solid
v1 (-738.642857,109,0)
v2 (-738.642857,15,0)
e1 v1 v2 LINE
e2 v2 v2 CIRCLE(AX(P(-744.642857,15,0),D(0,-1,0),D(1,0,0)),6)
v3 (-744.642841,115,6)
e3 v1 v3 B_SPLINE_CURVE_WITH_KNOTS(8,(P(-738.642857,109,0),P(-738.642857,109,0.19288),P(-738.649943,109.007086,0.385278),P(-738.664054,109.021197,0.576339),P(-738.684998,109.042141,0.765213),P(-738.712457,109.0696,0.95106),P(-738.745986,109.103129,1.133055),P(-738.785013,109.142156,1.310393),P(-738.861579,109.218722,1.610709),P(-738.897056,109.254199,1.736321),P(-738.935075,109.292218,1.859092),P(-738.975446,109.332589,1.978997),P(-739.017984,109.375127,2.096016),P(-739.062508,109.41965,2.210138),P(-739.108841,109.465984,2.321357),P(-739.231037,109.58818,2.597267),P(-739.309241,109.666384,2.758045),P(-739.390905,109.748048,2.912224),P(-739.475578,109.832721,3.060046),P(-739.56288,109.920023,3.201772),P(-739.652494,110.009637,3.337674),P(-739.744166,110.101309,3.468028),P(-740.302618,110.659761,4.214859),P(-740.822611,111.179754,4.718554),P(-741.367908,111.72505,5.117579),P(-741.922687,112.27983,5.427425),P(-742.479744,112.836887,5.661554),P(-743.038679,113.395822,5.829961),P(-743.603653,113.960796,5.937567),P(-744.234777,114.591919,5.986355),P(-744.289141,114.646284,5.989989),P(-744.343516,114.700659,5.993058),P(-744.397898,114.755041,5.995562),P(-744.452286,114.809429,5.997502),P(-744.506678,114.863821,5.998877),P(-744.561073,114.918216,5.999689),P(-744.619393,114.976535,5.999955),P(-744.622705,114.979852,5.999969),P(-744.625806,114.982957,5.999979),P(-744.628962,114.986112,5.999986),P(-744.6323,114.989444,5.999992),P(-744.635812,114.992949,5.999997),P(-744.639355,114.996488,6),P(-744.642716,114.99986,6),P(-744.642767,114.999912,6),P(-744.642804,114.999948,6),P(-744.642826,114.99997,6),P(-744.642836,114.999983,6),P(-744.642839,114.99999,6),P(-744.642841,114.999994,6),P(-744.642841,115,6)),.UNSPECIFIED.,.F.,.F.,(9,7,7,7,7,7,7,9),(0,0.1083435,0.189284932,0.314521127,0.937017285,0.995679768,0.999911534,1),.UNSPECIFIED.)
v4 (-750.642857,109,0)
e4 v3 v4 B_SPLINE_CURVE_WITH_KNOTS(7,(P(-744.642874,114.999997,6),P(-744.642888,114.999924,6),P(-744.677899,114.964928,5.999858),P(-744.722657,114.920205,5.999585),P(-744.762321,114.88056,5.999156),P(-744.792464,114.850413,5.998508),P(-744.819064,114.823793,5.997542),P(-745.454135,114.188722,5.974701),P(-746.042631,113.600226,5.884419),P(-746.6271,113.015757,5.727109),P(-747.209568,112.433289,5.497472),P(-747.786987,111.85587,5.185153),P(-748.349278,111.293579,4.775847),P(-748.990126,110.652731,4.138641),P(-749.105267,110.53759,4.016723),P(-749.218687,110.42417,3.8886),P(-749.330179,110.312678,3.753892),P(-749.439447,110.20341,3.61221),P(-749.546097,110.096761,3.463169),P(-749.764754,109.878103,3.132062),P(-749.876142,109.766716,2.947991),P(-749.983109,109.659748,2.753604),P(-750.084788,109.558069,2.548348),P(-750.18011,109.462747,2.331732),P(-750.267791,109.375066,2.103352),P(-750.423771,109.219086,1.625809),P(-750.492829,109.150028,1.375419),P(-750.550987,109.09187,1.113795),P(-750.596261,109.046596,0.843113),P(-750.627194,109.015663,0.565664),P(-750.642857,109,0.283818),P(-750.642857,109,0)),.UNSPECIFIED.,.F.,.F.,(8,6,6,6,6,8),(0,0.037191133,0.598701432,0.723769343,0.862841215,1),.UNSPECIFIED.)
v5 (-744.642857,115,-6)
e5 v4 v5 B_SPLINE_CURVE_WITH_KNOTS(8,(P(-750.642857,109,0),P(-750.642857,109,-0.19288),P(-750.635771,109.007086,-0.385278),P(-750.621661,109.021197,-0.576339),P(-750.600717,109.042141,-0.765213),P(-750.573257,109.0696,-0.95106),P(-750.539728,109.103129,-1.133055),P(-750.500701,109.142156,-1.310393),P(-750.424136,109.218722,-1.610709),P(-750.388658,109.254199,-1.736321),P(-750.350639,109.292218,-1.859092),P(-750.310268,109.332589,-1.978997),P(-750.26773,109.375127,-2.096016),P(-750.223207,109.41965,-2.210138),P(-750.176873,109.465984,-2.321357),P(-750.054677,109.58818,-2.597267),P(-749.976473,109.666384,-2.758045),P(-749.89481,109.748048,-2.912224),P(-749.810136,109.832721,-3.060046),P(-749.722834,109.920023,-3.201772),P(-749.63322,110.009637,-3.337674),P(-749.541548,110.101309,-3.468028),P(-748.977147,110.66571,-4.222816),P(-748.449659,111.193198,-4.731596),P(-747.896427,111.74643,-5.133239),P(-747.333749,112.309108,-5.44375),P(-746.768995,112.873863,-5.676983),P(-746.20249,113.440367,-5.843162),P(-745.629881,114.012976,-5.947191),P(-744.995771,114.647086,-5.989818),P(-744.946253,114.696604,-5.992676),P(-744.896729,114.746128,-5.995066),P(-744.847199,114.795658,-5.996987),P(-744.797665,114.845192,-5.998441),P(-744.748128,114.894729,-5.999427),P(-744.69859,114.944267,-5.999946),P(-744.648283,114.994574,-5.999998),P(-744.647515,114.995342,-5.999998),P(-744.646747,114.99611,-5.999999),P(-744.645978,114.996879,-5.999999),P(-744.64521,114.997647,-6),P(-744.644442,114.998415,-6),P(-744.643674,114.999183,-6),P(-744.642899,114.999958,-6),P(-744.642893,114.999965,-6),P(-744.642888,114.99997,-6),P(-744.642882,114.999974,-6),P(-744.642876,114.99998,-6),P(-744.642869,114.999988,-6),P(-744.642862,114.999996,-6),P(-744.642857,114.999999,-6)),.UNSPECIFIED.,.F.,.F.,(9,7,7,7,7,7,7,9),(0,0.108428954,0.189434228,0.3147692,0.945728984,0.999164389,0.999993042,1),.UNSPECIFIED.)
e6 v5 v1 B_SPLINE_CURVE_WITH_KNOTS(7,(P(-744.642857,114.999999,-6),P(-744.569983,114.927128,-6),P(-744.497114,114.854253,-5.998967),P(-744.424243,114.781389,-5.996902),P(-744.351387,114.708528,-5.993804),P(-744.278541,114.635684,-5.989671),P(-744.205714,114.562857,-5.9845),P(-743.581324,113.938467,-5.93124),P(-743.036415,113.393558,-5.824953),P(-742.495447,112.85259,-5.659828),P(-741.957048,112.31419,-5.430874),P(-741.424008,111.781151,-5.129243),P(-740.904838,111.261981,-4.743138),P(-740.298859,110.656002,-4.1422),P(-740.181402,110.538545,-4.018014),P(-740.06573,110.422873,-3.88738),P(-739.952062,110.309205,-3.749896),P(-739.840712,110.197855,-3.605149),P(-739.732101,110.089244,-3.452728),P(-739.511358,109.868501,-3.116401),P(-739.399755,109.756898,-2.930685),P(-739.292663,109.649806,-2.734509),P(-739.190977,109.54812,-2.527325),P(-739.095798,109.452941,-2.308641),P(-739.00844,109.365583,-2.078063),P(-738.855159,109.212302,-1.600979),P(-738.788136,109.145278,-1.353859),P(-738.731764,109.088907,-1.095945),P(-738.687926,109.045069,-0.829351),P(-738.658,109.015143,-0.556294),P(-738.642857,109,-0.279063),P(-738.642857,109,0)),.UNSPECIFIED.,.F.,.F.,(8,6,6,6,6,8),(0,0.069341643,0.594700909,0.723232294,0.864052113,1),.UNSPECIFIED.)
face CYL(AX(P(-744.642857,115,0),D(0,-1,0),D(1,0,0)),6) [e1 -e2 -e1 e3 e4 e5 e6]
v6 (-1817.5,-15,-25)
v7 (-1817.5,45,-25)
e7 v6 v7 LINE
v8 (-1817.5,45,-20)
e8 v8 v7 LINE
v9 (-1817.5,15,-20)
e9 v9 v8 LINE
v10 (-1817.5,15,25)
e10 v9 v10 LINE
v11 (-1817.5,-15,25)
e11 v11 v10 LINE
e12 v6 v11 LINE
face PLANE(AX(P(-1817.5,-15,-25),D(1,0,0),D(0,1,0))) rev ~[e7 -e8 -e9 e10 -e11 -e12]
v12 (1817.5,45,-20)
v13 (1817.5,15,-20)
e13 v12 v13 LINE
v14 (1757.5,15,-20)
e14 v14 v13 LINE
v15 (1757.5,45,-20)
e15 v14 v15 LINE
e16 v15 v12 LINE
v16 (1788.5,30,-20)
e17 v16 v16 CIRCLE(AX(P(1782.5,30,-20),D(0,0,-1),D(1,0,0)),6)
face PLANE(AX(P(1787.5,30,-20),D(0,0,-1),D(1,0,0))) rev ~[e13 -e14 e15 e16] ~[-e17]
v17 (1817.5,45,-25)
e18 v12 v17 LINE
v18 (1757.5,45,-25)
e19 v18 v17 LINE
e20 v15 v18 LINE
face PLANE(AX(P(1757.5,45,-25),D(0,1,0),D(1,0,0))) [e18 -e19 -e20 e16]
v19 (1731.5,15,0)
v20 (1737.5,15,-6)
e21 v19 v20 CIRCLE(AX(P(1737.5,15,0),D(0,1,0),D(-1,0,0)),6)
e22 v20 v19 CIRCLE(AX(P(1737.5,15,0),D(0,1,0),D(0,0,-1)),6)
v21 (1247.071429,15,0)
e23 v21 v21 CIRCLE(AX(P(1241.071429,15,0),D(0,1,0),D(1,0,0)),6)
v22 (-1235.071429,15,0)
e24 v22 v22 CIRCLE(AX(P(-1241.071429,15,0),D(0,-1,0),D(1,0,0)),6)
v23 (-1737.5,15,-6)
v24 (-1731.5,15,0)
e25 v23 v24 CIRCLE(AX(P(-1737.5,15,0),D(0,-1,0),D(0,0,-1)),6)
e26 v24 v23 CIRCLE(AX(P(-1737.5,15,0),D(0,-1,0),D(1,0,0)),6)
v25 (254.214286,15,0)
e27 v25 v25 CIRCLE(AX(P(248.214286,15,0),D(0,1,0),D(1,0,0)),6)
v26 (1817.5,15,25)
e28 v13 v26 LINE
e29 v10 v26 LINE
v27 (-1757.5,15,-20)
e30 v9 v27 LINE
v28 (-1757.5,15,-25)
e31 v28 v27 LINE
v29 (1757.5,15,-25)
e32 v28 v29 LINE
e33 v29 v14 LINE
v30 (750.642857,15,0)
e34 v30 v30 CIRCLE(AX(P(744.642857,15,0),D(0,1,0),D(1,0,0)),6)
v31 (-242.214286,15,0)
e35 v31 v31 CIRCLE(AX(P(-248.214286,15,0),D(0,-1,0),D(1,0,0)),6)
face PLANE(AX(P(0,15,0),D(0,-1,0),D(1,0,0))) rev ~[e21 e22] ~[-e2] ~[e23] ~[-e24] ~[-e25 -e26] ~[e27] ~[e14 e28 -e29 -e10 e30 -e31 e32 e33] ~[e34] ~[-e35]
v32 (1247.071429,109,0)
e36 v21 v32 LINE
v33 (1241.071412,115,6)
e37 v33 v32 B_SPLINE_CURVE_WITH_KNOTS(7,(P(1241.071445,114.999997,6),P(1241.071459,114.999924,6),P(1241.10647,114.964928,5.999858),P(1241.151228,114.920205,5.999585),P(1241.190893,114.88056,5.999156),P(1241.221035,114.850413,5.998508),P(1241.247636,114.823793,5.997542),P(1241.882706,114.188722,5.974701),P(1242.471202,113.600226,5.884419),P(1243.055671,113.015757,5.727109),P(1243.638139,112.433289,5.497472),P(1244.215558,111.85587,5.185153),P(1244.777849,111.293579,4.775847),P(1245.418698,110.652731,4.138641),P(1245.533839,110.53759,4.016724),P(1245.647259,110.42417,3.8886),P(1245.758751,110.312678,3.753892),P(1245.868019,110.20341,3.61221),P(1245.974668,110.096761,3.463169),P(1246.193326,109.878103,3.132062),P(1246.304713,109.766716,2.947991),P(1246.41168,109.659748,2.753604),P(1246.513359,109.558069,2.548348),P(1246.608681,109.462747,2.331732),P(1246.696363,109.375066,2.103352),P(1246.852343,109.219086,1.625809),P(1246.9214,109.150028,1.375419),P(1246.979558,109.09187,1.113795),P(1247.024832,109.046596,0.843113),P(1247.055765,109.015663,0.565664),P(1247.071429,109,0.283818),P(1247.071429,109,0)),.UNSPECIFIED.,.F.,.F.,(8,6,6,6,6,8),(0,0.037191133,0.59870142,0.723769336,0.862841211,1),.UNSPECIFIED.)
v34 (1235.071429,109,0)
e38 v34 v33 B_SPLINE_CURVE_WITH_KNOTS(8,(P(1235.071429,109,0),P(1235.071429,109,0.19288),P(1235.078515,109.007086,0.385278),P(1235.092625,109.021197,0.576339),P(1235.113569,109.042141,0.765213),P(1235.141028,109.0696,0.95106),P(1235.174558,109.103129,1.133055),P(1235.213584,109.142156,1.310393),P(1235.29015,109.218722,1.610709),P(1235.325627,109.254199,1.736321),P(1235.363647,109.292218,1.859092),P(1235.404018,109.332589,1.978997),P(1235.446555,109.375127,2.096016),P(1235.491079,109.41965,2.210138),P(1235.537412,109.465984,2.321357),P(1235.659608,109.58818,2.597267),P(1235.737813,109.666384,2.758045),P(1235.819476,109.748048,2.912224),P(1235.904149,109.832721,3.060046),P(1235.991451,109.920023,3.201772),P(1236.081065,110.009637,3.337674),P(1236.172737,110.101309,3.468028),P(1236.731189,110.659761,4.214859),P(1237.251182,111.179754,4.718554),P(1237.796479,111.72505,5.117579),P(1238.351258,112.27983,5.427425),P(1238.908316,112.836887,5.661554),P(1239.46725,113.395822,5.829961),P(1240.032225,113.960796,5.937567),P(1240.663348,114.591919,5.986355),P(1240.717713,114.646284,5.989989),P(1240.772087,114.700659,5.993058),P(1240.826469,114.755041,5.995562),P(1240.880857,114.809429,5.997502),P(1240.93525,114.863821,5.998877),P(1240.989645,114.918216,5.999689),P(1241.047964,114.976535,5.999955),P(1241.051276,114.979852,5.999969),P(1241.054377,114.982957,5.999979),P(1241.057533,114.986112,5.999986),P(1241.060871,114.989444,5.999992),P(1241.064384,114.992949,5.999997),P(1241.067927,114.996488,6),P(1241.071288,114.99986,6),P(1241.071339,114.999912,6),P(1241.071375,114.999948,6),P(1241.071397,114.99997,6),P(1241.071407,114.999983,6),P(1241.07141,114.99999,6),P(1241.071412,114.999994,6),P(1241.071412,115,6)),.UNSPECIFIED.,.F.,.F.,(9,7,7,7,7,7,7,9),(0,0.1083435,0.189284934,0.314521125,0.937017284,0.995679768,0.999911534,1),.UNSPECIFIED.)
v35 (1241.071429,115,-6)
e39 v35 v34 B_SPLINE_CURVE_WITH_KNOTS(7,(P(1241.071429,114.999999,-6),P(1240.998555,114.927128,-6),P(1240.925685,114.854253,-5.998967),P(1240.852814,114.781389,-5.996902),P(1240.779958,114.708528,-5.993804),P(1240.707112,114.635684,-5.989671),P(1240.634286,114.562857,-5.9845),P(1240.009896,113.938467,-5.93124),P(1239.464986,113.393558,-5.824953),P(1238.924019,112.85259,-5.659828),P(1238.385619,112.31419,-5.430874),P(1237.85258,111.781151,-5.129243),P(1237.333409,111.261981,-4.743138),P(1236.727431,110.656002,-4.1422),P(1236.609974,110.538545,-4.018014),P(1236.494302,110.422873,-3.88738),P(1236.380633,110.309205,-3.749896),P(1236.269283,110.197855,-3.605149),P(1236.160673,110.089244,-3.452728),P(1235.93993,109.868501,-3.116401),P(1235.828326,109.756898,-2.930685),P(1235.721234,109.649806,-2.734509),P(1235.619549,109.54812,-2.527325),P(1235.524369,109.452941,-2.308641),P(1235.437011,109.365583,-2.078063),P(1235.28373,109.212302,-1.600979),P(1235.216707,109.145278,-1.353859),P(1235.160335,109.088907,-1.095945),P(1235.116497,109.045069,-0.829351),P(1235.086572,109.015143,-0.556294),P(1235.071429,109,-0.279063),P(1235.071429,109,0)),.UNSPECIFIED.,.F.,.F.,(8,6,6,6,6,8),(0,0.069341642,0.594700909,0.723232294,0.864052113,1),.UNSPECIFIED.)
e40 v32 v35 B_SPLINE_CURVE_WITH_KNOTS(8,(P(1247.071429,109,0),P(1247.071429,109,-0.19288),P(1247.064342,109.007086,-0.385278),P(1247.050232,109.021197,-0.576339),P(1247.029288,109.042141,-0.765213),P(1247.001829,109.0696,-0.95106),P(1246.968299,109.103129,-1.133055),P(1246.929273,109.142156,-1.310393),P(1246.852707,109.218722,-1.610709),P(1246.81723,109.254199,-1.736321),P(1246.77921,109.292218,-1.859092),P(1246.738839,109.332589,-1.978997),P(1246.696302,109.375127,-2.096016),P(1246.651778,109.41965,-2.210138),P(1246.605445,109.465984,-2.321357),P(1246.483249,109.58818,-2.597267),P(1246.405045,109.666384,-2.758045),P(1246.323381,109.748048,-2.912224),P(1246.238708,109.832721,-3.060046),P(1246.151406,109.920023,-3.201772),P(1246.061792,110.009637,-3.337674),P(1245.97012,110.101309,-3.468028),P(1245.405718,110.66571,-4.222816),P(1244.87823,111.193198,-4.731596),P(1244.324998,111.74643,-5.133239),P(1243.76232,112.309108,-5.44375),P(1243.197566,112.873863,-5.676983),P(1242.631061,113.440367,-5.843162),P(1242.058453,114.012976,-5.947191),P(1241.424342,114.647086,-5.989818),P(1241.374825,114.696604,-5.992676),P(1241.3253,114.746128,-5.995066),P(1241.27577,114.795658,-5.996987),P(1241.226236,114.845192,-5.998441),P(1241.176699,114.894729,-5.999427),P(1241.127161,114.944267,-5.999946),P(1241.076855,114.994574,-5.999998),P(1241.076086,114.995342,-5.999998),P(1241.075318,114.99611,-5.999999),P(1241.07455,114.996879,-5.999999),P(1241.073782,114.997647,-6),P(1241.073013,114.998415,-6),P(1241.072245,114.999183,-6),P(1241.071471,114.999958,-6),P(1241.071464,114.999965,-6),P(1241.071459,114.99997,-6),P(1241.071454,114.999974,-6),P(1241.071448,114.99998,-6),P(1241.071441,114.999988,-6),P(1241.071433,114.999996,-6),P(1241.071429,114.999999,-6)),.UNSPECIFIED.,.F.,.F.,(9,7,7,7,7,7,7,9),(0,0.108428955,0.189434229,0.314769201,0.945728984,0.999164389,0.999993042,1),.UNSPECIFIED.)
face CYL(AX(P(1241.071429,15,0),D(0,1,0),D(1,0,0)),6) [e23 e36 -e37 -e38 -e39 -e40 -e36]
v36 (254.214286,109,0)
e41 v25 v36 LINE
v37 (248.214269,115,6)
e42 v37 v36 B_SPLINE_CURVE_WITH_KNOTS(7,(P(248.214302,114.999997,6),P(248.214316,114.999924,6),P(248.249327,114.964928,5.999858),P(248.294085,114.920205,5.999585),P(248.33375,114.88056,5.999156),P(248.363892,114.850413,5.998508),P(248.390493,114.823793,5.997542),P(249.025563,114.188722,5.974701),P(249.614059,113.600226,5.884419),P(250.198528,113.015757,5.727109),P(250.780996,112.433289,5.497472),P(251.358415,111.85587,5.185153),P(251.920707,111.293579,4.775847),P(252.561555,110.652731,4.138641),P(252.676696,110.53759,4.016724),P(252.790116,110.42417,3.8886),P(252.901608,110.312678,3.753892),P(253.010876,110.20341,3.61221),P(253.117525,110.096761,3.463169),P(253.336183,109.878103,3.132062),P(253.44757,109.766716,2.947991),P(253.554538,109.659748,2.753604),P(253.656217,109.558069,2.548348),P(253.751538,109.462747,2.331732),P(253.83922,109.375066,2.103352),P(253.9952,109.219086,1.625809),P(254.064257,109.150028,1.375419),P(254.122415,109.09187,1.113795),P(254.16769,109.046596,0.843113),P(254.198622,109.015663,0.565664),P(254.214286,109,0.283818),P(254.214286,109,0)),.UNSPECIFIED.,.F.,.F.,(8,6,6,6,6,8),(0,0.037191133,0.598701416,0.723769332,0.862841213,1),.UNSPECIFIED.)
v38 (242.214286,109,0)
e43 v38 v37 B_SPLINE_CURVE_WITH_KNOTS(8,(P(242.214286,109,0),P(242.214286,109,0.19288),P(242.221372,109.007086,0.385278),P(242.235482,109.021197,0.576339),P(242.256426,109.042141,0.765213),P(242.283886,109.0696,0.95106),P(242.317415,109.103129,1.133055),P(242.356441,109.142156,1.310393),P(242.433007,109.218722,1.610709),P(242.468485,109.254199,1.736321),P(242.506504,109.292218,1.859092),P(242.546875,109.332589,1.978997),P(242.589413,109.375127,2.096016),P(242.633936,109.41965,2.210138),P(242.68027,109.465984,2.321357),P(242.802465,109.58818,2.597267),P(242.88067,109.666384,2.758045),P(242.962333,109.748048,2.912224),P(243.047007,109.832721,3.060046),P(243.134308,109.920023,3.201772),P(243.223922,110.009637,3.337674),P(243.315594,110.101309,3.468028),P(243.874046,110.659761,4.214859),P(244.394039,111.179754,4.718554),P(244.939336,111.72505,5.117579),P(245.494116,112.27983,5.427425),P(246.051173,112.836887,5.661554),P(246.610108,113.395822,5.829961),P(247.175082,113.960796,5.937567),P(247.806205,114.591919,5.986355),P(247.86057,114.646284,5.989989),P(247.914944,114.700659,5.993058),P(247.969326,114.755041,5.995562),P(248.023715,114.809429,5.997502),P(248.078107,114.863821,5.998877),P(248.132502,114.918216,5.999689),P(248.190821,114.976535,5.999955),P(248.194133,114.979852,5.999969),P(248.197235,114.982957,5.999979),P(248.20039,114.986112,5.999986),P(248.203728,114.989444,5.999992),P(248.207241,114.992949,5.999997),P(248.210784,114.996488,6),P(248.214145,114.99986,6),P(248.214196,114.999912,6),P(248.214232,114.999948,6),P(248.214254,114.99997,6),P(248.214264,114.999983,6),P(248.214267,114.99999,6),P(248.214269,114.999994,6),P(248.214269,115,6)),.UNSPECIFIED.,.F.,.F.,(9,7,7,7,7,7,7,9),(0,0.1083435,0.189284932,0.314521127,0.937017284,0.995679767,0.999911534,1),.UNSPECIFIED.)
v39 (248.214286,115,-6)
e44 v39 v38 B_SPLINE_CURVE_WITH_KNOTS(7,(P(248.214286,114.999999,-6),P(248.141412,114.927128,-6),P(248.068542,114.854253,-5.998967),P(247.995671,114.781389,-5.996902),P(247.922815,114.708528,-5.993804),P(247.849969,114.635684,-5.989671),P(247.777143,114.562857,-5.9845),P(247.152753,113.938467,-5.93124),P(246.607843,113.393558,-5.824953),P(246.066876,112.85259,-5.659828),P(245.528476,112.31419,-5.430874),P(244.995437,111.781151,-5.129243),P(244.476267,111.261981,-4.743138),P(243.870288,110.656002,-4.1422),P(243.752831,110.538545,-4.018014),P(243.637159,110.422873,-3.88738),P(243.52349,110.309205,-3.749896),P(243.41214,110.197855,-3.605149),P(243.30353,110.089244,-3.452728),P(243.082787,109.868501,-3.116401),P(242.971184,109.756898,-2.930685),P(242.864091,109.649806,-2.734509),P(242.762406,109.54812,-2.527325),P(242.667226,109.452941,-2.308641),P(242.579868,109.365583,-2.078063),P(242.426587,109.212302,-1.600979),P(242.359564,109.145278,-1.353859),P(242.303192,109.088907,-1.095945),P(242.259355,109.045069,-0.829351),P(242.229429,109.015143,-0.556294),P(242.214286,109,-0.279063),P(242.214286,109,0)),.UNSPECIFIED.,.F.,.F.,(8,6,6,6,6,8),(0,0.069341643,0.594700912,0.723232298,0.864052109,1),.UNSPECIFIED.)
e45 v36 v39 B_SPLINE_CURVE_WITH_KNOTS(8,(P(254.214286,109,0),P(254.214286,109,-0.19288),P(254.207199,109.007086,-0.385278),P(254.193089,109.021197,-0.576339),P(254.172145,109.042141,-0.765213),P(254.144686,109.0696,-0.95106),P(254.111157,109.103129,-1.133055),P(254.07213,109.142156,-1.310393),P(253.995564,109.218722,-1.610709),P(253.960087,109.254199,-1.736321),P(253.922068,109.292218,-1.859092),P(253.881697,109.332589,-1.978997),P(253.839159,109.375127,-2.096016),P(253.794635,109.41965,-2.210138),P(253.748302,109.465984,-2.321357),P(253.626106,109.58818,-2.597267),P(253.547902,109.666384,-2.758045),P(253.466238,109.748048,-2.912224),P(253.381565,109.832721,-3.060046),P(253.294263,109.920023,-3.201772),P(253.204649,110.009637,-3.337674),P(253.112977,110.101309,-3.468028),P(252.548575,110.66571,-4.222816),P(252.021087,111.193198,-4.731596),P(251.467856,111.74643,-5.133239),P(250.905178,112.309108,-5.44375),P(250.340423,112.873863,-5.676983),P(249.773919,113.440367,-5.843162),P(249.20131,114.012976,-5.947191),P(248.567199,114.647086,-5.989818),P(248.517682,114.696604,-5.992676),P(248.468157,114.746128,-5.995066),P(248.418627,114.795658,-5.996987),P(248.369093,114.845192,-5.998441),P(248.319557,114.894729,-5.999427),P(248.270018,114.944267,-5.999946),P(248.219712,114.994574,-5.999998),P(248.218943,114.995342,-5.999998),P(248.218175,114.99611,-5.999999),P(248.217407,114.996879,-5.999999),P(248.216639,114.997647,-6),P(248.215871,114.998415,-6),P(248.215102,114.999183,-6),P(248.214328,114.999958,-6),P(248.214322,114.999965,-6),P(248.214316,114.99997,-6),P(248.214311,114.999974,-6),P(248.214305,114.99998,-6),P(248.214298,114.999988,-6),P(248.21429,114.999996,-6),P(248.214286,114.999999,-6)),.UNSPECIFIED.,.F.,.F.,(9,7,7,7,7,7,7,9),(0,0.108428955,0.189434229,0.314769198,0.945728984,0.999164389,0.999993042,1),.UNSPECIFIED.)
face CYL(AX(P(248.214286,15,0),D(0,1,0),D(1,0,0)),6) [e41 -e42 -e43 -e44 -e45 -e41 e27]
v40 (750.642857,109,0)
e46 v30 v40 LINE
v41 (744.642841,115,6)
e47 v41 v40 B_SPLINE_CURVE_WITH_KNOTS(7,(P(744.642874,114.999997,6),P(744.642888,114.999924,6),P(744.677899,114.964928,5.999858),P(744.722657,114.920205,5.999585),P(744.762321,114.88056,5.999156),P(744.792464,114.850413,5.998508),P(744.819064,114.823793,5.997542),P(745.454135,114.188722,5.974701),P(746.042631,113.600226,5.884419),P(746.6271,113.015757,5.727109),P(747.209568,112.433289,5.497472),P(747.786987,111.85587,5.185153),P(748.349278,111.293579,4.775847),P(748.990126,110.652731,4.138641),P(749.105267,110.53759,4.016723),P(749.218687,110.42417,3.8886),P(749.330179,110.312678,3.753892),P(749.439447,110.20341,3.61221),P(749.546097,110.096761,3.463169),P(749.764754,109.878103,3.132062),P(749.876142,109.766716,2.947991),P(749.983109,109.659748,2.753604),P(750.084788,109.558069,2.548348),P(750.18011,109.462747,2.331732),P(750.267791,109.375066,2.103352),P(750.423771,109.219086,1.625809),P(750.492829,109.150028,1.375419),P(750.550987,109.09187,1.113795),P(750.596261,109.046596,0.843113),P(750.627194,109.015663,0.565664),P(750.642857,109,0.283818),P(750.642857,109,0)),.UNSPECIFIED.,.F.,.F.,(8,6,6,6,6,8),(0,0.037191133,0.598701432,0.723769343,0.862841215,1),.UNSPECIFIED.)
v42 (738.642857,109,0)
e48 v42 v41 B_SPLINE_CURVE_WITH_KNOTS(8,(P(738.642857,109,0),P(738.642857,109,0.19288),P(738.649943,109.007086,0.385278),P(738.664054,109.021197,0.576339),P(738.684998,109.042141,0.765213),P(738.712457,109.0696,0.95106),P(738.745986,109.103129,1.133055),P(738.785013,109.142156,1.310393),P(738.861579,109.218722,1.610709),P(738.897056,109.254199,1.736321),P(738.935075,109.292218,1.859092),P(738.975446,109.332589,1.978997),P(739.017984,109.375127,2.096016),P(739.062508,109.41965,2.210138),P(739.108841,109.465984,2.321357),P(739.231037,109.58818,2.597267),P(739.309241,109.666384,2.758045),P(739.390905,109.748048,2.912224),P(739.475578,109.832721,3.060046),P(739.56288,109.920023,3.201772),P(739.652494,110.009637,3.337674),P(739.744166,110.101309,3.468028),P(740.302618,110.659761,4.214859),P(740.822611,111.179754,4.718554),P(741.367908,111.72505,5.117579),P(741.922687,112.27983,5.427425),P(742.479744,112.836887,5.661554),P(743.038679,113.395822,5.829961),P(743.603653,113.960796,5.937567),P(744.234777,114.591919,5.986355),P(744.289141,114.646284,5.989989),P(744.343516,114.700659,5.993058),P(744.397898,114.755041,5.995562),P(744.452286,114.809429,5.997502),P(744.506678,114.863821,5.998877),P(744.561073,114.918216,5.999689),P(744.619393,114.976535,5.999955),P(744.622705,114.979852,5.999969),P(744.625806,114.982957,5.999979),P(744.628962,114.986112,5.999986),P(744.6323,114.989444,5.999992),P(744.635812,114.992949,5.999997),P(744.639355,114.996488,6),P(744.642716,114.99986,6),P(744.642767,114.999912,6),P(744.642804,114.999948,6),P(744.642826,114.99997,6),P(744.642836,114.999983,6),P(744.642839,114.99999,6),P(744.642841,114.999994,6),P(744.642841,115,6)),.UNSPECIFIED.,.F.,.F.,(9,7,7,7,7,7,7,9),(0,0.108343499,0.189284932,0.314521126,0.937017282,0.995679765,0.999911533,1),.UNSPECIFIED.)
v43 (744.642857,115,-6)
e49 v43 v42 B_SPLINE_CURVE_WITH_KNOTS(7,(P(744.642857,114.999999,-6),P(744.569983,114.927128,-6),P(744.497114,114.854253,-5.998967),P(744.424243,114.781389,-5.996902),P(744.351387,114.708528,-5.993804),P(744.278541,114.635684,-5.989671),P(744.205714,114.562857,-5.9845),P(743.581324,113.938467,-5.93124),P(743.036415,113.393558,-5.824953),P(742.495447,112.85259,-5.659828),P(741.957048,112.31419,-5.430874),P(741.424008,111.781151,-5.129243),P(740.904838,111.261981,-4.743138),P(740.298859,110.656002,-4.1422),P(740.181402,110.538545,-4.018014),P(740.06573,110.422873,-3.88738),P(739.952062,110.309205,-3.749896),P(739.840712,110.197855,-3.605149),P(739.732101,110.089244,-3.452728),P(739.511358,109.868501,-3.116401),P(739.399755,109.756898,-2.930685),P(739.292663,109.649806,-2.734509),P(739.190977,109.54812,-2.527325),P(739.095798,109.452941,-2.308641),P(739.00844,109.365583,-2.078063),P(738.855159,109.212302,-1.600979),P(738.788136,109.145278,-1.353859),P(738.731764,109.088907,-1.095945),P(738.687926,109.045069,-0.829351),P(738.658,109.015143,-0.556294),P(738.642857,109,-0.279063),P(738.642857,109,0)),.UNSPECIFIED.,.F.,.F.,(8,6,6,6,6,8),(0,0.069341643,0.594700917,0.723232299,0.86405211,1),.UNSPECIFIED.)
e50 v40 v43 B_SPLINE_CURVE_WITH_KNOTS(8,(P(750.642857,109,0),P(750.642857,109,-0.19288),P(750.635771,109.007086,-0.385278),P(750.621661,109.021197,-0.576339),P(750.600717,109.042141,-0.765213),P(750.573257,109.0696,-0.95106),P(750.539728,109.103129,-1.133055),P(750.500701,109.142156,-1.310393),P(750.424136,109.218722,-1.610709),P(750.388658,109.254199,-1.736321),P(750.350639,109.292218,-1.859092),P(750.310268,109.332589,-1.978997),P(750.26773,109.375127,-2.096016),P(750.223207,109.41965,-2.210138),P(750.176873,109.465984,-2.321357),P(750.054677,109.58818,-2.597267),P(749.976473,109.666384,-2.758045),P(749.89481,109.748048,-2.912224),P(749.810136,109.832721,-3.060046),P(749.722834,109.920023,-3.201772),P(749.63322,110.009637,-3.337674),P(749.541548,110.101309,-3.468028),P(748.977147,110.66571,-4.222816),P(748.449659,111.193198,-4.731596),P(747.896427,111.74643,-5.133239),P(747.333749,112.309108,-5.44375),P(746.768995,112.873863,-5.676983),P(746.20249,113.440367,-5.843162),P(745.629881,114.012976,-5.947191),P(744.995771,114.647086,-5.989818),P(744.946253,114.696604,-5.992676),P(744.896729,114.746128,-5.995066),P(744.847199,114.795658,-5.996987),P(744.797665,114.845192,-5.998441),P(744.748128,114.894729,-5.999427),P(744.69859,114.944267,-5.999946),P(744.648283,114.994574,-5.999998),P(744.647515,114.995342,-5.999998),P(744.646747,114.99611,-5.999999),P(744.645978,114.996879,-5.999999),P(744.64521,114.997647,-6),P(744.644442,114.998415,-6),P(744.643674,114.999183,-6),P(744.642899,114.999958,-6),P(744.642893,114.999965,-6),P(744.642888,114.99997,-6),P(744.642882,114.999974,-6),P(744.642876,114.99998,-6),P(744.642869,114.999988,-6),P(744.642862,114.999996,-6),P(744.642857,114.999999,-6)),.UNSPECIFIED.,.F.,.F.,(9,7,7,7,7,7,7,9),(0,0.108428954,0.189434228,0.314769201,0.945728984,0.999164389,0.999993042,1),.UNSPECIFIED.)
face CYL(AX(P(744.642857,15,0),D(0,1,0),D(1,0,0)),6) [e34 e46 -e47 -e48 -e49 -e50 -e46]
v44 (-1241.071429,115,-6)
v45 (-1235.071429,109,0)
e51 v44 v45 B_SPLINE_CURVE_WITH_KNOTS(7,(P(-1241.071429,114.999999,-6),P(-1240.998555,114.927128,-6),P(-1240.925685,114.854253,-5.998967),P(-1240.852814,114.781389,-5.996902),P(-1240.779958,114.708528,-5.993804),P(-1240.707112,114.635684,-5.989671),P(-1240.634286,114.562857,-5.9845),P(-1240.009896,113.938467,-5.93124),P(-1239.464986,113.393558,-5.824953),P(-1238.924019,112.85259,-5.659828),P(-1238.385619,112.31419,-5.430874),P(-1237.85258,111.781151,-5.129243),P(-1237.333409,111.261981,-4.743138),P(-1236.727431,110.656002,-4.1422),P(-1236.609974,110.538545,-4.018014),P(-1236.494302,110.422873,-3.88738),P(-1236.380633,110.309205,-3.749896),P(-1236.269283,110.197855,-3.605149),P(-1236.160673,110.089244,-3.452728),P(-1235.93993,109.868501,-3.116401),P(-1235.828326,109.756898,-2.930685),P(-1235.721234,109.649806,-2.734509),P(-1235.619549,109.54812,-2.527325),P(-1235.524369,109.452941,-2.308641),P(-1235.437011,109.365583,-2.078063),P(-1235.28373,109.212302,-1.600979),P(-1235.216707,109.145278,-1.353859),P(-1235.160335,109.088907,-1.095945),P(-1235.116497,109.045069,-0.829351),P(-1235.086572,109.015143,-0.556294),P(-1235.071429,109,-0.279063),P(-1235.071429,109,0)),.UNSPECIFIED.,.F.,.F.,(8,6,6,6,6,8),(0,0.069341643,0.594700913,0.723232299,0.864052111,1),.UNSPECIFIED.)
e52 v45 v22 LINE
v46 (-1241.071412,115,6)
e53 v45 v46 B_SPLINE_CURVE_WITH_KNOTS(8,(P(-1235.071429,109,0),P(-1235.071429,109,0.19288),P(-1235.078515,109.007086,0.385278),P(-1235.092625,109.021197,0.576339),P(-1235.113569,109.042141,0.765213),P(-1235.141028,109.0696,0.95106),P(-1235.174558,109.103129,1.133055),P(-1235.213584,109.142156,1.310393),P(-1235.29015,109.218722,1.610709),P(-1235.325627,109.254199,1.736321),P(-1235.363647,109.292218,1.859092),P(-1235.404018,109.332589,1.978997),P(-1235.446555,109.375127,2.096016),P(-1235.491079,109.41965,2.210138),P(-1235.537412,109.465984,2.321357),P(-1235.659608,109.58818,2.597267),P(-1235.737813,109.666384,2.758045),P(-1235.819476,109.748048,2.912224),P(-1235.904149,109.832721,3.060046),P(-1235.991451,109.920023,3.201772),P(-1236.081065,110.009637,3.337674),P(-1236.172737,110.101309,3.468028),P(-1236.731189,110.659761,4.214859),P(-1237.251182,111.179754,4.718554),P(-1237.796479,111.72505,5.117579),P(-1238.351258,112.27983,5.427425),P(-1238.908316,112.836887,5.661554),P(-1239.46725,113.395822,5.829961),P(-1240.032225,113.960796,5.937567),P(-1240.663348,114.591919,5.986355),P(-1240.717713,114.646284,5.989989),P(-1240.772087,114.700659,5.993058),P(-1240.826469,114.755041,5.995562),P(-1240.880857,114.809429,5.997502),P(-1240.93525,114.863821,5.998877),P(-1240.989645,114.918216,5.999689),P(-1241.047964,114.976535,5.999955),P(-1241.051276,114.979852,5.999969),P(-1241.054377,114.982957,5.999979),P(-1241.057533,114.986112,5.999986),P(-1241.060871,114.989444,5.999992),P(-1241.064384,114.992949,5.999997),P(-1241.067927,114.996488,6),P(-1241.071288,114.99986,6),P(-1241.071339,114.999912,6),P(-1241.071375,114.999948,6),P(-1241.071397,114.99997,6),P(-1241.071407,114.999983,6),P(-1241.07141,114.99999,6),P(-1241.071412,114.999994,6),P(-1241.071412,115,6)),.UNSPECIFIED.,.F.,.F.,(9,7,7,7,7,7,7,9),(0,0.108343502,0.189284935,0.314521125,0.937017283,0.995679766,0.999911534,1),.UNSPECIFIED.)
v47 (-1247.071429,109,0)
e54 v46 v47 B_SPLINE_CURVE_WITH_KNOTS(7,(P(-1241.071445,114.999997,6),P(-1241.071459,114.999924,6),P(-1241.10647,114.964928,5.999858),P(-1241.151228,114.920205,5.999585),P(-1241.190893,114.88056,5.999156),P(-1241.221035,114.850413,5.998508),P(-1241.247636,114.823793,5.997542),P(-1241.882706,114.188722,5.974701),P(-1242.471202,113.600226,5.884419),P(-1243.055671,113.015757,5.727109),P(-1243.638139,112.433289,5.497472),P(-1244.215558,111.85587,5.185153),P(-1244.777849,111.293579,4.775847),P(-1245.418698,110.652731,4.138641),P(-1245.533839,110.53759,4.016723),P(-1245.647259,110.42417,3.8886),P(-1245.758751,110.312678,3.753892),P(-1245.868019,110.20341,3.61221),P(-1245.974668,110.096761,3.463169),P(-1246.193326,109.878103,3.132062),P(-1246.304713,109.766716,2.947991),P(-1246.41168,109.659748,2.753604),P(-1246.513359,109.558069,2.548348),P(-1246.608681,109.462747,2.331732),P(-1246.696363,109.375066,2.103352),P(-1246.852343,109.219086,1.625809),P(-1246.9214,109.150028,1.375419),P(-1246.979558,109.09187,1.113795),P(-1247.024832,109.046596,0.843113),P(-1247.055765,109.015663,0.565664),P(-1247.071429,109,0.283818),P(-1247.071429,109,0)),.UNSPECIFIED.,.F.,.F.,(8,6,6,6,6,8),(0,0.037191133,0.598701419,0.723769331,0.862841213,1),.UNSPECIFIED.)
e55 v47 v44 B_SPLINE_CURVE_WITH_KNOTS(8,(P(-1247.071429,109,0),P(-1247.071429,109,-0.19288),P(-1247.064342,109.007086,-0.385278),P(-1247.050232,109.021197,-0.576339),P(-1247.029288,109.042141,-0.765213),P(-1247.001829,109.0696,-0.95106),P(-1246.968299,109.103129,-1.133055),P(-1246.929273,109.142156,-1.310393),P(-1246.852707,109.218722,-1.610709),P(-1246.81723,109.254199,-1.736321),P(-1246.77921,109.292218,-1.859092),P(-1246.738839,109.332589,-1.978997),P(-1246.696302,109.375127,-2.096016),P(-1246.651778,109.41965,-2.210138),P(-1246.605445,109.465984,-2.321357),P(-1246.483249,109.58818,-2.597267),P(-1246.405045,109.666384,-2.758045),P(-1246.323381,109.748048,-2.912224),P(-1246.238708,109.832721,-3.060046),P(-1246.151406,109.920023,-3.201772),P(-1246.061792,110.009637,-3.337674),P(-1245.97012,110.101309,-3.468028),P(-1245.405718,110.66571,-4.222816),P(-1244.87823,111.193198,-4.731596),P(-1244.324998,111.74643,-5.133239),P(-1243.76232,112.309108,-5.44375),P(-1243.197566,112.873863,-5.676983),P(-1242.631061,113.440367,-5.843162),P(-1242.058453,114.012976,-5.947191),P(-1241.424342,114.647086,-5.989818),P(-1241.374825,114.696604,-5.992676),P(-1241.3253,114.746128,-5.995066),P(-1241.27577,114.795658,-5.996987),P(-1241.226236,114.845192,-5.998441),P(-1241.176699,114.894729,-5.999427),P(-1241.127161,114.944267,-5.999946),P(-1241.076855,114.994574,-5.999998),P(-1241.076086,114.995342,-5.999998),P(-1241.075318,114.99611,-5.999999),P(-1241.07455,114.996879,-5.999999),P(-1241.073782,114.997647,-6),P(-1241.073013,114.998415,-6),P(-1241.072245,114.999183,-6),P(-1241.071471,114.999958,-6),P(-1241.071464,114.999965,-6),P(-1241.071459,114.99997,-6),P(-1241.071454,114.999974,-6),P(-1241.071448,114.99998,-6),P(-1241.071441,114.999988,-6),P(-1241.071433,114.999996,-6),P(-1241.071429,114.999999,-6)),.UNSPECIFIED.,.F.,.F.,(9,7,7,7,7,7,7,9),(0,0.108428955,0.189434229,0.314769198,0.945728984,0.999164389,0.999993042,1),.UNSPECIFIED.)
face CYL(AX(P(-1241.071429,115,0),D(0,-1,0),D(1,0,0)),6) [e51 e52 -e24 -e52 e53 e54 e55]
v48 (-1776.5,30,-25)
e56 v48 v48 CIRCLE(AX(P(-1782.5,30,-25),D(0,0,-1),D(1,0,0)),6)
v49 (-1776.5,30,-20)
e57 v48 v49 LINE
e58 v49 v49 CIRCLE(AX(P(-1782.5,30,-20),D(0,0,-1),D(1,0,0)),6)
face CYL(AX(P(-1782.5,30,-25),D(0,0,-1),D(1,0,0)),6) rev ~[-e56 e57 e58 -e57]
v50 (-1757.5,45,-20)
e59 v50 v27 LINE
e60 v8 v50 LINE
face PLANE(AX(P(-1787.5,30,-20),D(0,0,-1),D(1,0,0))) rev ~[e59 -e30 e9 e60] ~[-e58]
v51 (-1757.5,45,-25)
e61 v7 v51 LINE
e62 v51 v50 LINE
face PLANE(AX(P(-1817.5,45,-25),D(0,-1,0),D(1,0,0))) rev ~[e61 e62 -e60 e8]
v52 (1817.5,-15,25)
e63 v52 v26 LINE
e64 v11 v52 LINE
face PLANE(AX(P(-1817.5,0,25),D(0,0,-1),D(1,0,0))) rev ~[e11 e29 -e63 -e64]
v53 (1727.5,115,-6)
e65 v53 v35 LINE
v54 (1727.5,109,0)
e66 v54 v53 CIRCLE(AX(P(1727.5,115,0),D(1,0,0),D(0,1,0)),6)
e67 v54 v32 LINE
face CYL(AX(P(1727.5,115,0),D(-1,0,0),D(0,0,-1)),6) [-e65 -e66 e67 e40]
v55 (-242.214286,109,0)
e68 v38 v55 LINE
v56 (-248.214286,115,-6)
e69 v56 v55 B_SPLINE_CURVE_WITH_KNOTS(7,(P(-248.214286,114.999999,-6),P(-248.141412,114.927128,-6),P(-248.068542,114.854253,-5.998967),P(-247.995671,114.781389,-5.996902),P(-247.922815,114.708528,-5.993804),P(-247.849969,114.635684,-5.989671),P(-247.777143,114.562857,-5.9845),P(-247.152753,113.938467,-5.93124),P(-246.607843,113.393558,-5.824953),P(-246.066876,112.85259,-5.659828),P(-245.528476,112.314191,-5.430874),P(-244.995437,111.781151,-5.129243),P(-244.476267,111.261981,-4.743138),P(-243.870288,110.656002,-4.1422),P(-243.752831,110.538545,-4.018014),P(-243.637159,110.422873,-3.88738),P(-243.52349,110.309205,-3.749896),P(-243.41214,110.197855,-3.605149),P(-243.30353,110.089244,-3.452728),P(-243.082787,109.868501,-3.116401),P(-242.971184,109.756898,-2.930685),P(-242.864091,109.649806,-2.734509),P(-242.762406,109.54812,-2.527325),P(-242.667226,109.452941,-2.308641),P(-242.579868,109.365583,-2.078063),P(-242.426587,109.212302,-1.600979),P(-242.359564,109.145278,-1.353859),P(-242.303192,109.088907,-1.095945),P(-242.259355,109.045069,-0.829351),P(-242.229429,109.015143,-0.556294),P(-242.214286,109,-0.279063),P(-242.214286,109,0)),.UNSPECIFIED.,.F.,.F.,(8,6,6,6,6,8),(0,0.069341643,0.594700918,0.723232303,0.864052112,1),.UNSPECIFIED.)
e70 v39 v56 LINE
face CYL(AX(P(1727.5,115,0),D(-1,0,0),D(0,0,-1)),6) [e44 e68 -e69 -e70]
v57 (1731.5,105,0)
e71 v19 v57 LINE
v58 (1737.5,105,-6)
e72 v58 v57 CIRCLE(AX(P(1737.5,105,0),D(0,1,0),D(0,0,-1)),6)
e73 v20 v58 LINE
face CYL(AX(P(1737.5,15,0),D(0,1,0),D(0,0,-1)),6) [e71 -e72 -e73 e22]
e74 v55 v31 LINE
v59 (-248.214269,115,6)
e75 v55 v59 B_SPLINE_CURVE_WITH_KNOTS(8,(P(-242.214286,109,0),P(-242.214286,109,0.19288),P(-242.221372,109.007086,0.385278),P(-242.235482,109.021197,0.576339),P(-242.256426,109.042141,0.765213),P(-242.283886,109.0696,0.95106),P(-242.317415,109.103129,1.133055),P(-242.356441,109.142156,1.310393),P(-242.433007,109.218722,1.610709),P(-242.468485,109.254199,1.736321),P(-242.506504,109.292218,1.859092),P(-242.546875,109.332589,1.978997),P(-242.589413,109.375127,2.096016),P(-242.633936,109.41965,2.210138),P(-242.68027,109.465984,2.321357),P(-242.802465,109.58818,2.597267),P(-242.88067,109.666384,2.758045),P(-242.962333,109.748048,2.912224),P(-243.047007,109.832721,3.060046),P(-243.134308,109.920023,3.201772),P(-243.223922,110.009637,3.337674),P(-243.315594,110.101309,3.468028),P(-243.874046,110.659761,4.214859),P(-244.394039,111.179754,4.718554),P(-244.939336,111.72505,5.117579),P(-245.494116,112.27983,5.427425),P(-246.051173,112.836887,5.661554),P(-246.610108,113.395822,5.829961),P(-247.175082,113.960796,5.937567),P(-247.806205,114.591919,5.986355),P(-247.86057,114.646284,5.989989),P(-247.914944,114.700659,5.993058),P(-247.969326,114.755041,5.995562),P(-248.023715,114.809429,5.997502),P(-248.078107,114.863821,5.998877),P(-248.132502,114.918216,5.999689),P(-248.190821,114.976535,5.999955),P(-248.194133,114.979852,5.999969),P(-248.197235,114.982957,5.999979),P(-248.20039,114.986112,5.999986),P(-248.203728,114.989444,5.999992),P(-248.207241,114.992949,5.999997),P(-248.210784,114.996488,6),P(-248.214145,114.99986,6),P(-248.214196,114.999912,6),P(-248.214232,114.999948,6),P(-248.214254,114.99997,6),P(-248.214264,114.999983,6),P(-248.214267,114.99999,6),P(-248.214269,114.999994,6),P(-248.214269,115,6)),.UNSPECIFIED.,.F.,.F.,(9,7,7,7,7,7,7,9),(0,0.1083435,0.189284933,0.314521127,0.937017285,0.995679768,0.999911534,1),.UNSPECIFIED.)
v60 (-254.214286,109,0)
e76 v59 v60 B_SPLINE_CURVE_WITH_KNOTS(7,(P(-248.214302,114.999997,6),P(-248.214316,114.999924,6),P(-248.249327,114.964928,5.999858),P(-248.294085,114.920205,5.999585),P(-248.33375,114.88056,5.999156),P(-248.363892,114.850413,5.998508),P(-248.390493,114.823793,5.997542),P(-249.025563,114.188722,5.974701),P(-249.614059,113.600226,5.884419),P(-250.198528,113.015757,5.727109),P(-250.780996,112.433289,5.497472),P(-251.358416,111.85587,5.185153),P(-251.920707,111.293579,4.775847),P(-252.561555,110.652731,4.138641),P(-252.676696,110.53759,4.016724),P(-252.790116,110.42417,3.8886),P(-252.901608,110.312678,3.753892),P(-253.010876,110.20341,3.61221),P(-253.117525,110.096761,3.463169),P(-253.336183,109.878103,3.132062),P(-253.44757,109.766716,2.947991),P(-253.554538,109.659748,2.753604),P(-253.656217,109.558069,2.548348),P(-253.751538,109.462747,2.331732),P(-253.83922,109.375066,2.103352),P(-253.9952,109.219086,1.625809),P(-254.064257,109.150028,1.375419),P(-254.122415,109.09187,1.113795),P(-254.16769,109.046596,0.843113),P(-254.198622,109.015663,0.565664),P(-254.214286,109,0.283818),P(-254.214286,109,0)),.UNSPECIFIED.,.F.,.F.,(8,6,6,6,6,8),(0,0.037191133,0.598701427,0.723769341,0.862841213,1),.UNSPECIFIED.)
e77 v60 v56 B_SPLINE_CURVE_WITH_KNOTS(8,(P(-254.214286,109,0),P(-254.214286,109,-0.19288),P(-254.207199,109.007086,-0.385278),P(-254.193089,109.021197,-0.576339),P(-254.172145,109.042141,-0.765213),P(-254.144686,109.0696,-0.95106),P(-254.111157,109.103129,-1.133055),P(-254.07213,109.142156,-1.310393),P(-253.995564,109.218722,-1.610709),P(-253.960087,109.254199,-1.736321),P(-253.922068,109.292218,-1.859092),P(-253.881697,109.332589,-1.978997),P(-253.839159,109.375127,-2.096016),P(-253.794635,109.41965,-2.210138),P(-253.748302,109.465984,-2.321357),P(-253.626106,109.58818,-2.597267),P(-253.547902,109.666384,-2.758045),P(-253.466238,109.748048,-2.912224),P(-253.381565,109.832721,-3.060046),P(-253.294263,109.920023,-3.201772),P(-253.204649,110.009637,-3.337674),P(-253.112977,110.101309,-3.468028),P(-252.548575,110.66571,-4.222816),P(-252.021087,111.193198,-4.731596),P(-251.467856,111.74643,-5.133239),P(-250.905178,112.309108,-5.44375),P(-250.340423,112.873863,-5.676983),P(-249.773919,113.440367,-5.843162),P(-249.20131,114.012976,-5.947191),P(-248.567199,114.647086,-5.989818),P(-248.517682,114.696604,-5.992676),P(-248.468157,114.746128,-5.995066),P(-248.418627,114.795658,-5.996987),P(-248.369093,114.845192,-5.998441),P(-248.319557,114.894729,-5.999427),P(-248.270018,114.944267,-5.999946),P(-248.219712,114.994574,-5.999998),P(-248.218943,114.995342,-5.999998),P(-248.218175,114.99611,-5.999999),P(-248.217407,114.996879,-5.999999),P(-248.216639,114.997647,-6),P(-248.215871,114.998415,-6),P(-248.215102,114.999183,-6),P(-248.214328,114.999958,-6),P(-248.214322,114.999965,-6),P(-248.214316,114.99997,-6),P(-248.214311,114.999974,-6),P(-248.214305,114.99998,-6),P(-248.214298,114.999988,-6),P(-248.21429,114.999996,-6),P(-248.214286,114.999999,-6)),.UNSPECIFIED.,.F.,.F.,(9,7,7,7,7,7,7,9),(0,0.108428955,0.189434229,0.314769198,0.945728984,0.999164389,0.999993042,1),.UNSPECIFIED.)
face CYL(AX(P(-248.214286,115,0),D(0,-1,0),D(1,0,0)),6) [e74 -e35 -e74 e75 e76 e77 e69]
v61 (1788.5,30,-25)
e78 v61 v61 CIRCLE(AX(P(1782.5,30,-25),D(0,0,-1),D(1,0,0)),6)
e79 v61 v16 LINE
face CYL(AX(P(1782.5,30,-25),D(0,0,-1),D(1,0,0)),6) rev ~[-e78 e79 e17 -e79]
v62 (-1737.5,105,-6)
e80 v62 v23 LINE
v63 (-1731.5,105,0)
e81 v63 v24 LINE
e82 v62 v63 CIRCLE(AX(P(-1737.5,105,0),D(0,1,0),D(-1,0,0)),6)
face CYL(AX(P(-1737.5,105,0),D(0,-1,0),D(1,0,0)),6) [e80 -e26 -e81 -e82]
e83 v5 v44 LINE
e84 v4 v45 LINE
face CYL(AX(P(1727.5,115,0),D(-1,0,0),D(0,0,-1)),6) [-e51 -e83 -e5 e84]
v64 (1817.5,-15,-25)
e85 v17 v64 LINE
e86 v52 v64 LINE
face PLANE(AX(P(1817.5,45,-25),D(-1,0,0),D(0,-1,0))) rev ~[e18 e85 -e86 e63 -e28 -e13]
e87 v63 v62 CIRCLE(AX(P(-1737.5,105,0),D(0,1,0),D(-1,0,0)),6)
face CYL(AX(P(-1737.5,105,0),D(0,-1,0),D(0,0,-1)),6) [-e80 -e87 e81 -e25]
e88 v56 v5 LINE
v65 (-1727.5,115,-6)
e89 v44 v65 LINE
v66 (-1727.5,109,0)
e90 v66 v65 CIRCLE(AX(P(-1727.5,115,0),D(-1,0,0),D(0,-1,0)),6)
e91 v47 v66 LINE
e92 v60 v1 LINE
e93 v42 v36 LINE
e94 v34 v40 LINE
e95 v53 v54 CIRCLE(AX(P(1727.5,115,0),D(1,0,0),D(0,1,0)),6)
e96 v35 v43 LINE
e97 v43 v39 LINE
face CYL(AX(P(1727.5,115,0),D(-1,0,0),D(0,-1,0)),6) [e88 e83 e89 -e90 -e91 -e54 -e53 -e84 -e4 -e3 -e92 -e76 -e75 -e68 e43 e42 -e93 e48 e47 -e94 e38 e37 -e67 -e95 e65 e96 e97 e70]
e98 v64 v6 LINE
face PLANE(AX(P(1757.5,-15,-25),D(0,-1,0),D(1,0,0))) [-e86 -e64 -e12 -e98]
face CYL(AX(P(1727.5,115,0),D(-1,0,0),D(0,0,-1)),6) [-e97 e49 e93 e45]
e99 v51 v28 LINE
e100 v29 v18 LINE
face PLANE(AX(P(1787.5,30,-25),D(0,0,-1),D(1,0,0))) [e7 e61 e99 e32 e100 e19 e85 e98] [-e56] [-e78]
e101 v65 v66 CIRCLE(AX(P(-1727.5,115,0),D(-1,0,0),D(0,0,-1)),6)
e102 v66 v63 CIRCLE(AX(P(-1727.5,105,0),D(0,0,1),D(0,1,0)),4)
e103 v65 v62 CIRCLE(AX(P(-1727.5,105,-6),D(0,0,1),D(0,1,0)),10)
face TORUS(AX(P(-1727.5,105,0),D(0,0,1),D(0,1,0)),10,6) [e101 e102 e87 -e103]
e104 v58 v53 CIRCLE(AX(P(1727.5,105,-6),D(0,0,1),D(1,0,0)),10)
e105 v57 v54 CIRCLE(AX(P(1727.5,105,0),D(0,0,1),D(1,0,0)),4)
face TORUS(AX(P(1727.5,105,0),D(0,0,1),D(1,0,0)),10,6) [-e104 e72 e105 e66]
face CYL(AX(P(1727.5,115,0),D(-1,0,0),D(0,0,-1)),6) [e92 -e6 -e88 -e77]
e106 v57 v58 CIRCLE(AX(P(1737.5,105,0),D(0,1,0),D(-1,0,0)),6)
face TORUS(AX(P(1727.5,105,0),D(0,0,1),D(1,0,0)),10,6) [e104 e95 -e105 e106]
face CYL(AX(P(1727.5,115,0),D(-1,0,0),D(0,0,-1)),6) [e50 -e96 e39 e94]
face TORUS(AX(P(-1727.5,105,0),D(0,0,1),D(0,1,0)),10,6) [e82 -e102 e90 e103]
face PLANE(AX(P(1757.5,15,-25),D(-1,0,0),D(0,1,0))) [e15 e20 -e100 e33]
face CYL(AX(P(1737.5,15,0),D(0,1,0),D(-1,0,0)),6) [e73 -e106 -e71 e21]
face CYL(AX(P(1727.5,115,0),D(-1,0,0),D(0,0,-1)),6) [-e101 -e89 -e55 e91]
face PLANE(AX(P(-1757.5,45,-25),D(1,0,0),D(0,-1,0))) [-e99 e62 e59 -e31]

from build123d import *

# Parameters (mm, degrees)
F0_W          = 3635
F0_H          = 50
F1_DEPTH      = 15
F1_DEPTH_BACK = 15
F2_W          = 60
F2_H          = 30
F3_DEPTH      = 5
F4_W          = 60
F4_H          = 30
F4_H_2        = 15
F5_DEPTH      = 5
F6_R          = 6
F7_DEPTH      = 5
F9_DEPTH      = 5
F10_DEPTH     = 5
F11_DEPTH     = 5


# Not quite as in the source:
# - a feature names something its author has since deleted; it is built from what else it names


with BuildPart() as f1:
    # F0 (on Front) → F1 (new body, two sides)
    with BuildSketch(Plane.XZ) as f1_sk:
        Rectangle(F0_W, F0_H)
    extrude(amount=F1_DEPTH)
    extrude(f1_sk.sketch, amount=-F1_DEPTH_BACK)

    # F2 (on face) → F3 (join)
    with BuildSketch(Plane(origin=(0, 0, -25), x_dir=(1, 0, 0), z_dir=(0, 0, -1))):
        with Locations((-1787.5, -30)):
            Rectangle(F2_W, F2_H)
        Polygon((-1757.5, 15), (-1817.5, 15), (-1817.5, 0), (-1817.5, -15), (-1757.5, -15), align=None)
    extrude(amount=F3_DEPTH)

    # F4 (on face) → F5 (join)
    with BuildSketch(Plane(origin=(0, 0, -25), x_dir=(1, 0, 0), z_dir=(0, 0, -1))):
        with Locations((1787.5, -30)):
            Rectangle(F4_W, F4_H)
        with Locations((1787.5, -7.5)):
            Rectangle(F4_W, F4_H_2)
        with Locations((1787.5, 7.5)):
            Rectangle(F4_W, F4_H_2)
    extrude(amount=F5_DEPTH)

    # F6 (on face) → F7 (cut, through all)
    with BuildSketch(Plane(origin=(0, 0, -30), x_dir=(1, 0, 0), z_dir=(0, 0, -1))):
        with Locations((1782.5, -30)):
            Circle(F6_R)
    extrude(amount=-F7_DEPTH, mode=Mode.SUBTRACT)

    # F8 (on face) → F9 (cut, through all)
    with BuildSketch(Plane(origin=(0, 0, -30), x_dir=(1, 0, 0), z_dir=(0, 0, -1))):
        with BuildLine():
            ThreePointArc((-1788.5, -30), (-1782.5, -36), (-1776.5, -30))
            ThreePointArc((-1776.5, -30), (-1782.5, -24), (-1788.5, -30))
        make_face()
    extrude(amount=-F9_DEPTH, mode=Mode.SUBTRACT)

    # F10 (add): faces of the model
    f10_faces = [f1.faces().sort_by_distance(p)[0] for p in [
        (1787.5, 44.3291796068, -25),
        (-1816.8291796068, 30, -25),
    ]]
    extrude(f10_faces, amount=F10_DEPTH)

    # F11 (cut): faces of the model
    f11_faces = [f1.faces().sort_by_distance(p)[0] for p in [
        (-1787.6621744947, 14.5134765159, -30),
        (1787.6621744947, 14.5134765159, -30),
    ]]
    extrude(f11_faces, amount=-F11_DEPTH, mode=Mode.SUBTRACT)

    # F14: sweep along a path in F13
    with BuildLine(Plane.XY) as f14_path:
        Line((1737.5, 15), (1737.5, 105))
        ThreePointArc((1737.5, 105), (1734.5710678119, 112.0710678119), (1727.5, 115))
        Line((1727.5, 115), (-1727.5, 115))
        ThreePointArc((-1727.5, 115), (-1734.5710678119, 112.0710678119), (-1737.5, 105))
        Line((-1737.5, 105), (-1737.5, 15))
    # F12 (on face) → F14 (sweep)
    with BuildSketch(Plane(origin=(0, 15, 0), x_dir=(-1, 0, 0), z_dir=(0, 1, 0))):
        with BuildLine():
            ThreePointArc((-1731.5, 0), (-1741.7426406871, 4.2426406871), (-1737.5, -6))
            Line((-1737.5, -6), (-1737.5, 0))
            Line((-1737.5, 0), (-1731.5, 0))
        make_face()
        with BuildLine():
            Line((-1737.5, 0), (-1737.5, -6))
            ThreePointArc((-1737.5, -6), (-1733.2573593129, -4.2426406871), (-1731.5, 0))
            Line((-1731.5, 0), (-1737.5, 0))
        make_face()
    sweep(path=f14_path.line)

    # F15: sweep along a path in F13
    with BuildLine(Plane.XY) as f15_path:
        Line((-1241.0714285714, 115), (-1241.0714285714, 15))
    # F12 (on face) → F15 (sweep)
    with BuildSketch(Plane(origin=(0, 15, 0), x_dir=(-1, 0, 0), z_dir=(0, 1, 0))):
        with BuildLine():
            ThreePointArc((1247.0714285714, 0), (1241.0714285714, 6), (1235.0714285714, 0))
            Line((1235.0714285714, 0), (1241.0714285714, 0))
            Line((1241.0714285714, 0), (1247.0714285714, 0))
        make_face()
        with BuildLine():
            Line((1241.0714285714, 0), (1235.0714285714, 0))
            ThreePointArc((1235.0714285714, 0), (1241.0714285714, -6), (1247.0714285714, 0))
            Line((1247.0714285714, 0), (1241.0714285714, 0))
        make_face()
    sweep(path=f15_path.line)

    # F16: sweep along a path in F13
    with BuildLine(Plane.XY) as f16_path:
        Line((-744.6428571429, 115), (-744.6428571429, 15))
    # F12 (on face) → F16 (sweep)
    with BuildSketch(Plane(origin=(0, 15, 0), x_dir=(-1, 0, 0), z_dir=(0, 1, 0))):
        with BuildLine():
            ThreePointArc((750.6428571429, 0), (744.6428571429, 6), (738.6428571429, 0))
            Line((738.6428571429, 0), (744.6428571429, 0))
            Line((744.6428571429, 0), (750.6428571429, 0))
        make_face()
        with BuildLine():
            Line((744.6428571429, 0), (738.6428571429, 0))
            ThreePointArc((738.6428571429, 0), (744.6428571429, -6), (750.6428571429, 0))
            Line((750.6428571429, 0), (744.6428571429, 0))
        make_face()
    sweep(path=f16_path.line)

    # F17: sweep along a path in F13
    with BuildLine(Plane.XY) as f17_path:
        Line((-248.2142857143, 115), (-248.2142857143, 15))
    # F12 (on face) → F17 (sweep)
    with BuildSketch(Plane(origin=(0, 15, 0), x_dir=(-1, 0, 0), z_dir=(0, 1, 0))):
        with BuildLine():
            ThreePointArc((254.2142857143, 0), (248.2142857143, 6), (242.2142857143, 0))
            Line((242.2142857143, 0), (248.2142857143, 0))
            Line((248.2142857143, 0), (254.2142857143, 0))
        make_face()
        with BuildLine():
            Line((248.2142857143, 0), (242.2142857143, 0))
            ThreePointArc((242.2142857143, 0), (248.2142857143, -6), (254.2142857143, 0))
            Line((254.2142857143, 0), (248.2142857143, 0))
        make_face()
    sweep(path=f17_path.line)

    # F18: sweep along a path in F13
    with BuildLine(Plane.XY) as f18_path:
        Line((248.2142857143, 15), (248.2142857143, 115))
    # F12 (on face) → F18 (sweep)
    with BuildSketch(Plane(origin=(0, 15, 0), x_dir=(-1, 0, 0), z_dir=(0, 1, 0))):
        with BuildLine():
            ThreePointArc((-242.2142857143, 0), (-248.2142857143, 6), (-254.2142857143, 0))
            Line((-254.2142857143, 0), (-248.2142857143, 0))
            Line((-248.2142857143, 0), (-242.2142857143, 0))
        make_face()
        with BuildLine():
            Line((-248.2142857143, 0), (-254.2142857143, 0))
            ThreePointArc((-254.2142857143, 0), (-248.2142857143, -6), (-242.2142857143, 0))
            Line((-242.2142857143, 0), (-248.2142857143, 0))
        make_face()
    sweep(path=f18_path.line)

    # F19: sweep along a path in F13
    with BuildLine(Plane.XY) as f19_path:
        Line((744.6428571429, 15), (744.6428571429, 115))
    # F12 (on face) → F19 (sweep)
    with BuildSketch(Plane(origin=(0, 15, 0), x_dir=(-1, 0, 0), z_dir=(0, 1, 0))):
        with BuildLine():
            ThreePointArc((-738.6428571429, 0), (-744.6428571429, 6), (-750.6428571429, 0))
            Line((-750.6428571429, 0), (-744.6428571429, 0))
            Line((-744.6428571429, 0), (-738.6428571429, 0))
        make_face()
        with BuildLine():
            Line((-744.6428571429, 0), (-750.6428571429, 0))
            ThreePointArc((-750.6428571429, 0), (-744.6428571429, -6), (-738.6428571429, 0))
            Line((-738.6428571429, 0), (-744.6428571429, 0))
        make_face()
    sweep(path=f19_path.line)

    # F20: sweep along a path in F13
    with BuildLine(Plane.XY) as f20_path:
        Line((1241.0714285714, 15), (1241.0714285714, 115))
    # F12 (on face) → F20 (sweep)
    with BuildSketch(Plane(origin=(0, 15, 0), x_dir=(-1, 0, 0), z_dir=(0, 1, 0))):
        with BuildLine():
            ThreePointArc((-1235.0714285714, 0), (-1241.0714285714, 6), (-1247.0714285714, 0))
            Line((-1247.0714285714, 0), (-1241.0714285714, 0))
            Line((-1241.0714285714, 0), (-1235.0714285714, 0))
        make_face()
        with BuildLine():
            Line((-1241.0714285714, 0), (-1247.0714285714, 0))
            ThreePointArc((-1247.0714285714, 0), (-1241.0714285714, -6), (-1235.0714285714, 0))
            Line((-1235.0714285714, 0), (-1241.0714285714, 0))
        make_face()
    sweep(path=f20_path.line)


solid = f1.part
